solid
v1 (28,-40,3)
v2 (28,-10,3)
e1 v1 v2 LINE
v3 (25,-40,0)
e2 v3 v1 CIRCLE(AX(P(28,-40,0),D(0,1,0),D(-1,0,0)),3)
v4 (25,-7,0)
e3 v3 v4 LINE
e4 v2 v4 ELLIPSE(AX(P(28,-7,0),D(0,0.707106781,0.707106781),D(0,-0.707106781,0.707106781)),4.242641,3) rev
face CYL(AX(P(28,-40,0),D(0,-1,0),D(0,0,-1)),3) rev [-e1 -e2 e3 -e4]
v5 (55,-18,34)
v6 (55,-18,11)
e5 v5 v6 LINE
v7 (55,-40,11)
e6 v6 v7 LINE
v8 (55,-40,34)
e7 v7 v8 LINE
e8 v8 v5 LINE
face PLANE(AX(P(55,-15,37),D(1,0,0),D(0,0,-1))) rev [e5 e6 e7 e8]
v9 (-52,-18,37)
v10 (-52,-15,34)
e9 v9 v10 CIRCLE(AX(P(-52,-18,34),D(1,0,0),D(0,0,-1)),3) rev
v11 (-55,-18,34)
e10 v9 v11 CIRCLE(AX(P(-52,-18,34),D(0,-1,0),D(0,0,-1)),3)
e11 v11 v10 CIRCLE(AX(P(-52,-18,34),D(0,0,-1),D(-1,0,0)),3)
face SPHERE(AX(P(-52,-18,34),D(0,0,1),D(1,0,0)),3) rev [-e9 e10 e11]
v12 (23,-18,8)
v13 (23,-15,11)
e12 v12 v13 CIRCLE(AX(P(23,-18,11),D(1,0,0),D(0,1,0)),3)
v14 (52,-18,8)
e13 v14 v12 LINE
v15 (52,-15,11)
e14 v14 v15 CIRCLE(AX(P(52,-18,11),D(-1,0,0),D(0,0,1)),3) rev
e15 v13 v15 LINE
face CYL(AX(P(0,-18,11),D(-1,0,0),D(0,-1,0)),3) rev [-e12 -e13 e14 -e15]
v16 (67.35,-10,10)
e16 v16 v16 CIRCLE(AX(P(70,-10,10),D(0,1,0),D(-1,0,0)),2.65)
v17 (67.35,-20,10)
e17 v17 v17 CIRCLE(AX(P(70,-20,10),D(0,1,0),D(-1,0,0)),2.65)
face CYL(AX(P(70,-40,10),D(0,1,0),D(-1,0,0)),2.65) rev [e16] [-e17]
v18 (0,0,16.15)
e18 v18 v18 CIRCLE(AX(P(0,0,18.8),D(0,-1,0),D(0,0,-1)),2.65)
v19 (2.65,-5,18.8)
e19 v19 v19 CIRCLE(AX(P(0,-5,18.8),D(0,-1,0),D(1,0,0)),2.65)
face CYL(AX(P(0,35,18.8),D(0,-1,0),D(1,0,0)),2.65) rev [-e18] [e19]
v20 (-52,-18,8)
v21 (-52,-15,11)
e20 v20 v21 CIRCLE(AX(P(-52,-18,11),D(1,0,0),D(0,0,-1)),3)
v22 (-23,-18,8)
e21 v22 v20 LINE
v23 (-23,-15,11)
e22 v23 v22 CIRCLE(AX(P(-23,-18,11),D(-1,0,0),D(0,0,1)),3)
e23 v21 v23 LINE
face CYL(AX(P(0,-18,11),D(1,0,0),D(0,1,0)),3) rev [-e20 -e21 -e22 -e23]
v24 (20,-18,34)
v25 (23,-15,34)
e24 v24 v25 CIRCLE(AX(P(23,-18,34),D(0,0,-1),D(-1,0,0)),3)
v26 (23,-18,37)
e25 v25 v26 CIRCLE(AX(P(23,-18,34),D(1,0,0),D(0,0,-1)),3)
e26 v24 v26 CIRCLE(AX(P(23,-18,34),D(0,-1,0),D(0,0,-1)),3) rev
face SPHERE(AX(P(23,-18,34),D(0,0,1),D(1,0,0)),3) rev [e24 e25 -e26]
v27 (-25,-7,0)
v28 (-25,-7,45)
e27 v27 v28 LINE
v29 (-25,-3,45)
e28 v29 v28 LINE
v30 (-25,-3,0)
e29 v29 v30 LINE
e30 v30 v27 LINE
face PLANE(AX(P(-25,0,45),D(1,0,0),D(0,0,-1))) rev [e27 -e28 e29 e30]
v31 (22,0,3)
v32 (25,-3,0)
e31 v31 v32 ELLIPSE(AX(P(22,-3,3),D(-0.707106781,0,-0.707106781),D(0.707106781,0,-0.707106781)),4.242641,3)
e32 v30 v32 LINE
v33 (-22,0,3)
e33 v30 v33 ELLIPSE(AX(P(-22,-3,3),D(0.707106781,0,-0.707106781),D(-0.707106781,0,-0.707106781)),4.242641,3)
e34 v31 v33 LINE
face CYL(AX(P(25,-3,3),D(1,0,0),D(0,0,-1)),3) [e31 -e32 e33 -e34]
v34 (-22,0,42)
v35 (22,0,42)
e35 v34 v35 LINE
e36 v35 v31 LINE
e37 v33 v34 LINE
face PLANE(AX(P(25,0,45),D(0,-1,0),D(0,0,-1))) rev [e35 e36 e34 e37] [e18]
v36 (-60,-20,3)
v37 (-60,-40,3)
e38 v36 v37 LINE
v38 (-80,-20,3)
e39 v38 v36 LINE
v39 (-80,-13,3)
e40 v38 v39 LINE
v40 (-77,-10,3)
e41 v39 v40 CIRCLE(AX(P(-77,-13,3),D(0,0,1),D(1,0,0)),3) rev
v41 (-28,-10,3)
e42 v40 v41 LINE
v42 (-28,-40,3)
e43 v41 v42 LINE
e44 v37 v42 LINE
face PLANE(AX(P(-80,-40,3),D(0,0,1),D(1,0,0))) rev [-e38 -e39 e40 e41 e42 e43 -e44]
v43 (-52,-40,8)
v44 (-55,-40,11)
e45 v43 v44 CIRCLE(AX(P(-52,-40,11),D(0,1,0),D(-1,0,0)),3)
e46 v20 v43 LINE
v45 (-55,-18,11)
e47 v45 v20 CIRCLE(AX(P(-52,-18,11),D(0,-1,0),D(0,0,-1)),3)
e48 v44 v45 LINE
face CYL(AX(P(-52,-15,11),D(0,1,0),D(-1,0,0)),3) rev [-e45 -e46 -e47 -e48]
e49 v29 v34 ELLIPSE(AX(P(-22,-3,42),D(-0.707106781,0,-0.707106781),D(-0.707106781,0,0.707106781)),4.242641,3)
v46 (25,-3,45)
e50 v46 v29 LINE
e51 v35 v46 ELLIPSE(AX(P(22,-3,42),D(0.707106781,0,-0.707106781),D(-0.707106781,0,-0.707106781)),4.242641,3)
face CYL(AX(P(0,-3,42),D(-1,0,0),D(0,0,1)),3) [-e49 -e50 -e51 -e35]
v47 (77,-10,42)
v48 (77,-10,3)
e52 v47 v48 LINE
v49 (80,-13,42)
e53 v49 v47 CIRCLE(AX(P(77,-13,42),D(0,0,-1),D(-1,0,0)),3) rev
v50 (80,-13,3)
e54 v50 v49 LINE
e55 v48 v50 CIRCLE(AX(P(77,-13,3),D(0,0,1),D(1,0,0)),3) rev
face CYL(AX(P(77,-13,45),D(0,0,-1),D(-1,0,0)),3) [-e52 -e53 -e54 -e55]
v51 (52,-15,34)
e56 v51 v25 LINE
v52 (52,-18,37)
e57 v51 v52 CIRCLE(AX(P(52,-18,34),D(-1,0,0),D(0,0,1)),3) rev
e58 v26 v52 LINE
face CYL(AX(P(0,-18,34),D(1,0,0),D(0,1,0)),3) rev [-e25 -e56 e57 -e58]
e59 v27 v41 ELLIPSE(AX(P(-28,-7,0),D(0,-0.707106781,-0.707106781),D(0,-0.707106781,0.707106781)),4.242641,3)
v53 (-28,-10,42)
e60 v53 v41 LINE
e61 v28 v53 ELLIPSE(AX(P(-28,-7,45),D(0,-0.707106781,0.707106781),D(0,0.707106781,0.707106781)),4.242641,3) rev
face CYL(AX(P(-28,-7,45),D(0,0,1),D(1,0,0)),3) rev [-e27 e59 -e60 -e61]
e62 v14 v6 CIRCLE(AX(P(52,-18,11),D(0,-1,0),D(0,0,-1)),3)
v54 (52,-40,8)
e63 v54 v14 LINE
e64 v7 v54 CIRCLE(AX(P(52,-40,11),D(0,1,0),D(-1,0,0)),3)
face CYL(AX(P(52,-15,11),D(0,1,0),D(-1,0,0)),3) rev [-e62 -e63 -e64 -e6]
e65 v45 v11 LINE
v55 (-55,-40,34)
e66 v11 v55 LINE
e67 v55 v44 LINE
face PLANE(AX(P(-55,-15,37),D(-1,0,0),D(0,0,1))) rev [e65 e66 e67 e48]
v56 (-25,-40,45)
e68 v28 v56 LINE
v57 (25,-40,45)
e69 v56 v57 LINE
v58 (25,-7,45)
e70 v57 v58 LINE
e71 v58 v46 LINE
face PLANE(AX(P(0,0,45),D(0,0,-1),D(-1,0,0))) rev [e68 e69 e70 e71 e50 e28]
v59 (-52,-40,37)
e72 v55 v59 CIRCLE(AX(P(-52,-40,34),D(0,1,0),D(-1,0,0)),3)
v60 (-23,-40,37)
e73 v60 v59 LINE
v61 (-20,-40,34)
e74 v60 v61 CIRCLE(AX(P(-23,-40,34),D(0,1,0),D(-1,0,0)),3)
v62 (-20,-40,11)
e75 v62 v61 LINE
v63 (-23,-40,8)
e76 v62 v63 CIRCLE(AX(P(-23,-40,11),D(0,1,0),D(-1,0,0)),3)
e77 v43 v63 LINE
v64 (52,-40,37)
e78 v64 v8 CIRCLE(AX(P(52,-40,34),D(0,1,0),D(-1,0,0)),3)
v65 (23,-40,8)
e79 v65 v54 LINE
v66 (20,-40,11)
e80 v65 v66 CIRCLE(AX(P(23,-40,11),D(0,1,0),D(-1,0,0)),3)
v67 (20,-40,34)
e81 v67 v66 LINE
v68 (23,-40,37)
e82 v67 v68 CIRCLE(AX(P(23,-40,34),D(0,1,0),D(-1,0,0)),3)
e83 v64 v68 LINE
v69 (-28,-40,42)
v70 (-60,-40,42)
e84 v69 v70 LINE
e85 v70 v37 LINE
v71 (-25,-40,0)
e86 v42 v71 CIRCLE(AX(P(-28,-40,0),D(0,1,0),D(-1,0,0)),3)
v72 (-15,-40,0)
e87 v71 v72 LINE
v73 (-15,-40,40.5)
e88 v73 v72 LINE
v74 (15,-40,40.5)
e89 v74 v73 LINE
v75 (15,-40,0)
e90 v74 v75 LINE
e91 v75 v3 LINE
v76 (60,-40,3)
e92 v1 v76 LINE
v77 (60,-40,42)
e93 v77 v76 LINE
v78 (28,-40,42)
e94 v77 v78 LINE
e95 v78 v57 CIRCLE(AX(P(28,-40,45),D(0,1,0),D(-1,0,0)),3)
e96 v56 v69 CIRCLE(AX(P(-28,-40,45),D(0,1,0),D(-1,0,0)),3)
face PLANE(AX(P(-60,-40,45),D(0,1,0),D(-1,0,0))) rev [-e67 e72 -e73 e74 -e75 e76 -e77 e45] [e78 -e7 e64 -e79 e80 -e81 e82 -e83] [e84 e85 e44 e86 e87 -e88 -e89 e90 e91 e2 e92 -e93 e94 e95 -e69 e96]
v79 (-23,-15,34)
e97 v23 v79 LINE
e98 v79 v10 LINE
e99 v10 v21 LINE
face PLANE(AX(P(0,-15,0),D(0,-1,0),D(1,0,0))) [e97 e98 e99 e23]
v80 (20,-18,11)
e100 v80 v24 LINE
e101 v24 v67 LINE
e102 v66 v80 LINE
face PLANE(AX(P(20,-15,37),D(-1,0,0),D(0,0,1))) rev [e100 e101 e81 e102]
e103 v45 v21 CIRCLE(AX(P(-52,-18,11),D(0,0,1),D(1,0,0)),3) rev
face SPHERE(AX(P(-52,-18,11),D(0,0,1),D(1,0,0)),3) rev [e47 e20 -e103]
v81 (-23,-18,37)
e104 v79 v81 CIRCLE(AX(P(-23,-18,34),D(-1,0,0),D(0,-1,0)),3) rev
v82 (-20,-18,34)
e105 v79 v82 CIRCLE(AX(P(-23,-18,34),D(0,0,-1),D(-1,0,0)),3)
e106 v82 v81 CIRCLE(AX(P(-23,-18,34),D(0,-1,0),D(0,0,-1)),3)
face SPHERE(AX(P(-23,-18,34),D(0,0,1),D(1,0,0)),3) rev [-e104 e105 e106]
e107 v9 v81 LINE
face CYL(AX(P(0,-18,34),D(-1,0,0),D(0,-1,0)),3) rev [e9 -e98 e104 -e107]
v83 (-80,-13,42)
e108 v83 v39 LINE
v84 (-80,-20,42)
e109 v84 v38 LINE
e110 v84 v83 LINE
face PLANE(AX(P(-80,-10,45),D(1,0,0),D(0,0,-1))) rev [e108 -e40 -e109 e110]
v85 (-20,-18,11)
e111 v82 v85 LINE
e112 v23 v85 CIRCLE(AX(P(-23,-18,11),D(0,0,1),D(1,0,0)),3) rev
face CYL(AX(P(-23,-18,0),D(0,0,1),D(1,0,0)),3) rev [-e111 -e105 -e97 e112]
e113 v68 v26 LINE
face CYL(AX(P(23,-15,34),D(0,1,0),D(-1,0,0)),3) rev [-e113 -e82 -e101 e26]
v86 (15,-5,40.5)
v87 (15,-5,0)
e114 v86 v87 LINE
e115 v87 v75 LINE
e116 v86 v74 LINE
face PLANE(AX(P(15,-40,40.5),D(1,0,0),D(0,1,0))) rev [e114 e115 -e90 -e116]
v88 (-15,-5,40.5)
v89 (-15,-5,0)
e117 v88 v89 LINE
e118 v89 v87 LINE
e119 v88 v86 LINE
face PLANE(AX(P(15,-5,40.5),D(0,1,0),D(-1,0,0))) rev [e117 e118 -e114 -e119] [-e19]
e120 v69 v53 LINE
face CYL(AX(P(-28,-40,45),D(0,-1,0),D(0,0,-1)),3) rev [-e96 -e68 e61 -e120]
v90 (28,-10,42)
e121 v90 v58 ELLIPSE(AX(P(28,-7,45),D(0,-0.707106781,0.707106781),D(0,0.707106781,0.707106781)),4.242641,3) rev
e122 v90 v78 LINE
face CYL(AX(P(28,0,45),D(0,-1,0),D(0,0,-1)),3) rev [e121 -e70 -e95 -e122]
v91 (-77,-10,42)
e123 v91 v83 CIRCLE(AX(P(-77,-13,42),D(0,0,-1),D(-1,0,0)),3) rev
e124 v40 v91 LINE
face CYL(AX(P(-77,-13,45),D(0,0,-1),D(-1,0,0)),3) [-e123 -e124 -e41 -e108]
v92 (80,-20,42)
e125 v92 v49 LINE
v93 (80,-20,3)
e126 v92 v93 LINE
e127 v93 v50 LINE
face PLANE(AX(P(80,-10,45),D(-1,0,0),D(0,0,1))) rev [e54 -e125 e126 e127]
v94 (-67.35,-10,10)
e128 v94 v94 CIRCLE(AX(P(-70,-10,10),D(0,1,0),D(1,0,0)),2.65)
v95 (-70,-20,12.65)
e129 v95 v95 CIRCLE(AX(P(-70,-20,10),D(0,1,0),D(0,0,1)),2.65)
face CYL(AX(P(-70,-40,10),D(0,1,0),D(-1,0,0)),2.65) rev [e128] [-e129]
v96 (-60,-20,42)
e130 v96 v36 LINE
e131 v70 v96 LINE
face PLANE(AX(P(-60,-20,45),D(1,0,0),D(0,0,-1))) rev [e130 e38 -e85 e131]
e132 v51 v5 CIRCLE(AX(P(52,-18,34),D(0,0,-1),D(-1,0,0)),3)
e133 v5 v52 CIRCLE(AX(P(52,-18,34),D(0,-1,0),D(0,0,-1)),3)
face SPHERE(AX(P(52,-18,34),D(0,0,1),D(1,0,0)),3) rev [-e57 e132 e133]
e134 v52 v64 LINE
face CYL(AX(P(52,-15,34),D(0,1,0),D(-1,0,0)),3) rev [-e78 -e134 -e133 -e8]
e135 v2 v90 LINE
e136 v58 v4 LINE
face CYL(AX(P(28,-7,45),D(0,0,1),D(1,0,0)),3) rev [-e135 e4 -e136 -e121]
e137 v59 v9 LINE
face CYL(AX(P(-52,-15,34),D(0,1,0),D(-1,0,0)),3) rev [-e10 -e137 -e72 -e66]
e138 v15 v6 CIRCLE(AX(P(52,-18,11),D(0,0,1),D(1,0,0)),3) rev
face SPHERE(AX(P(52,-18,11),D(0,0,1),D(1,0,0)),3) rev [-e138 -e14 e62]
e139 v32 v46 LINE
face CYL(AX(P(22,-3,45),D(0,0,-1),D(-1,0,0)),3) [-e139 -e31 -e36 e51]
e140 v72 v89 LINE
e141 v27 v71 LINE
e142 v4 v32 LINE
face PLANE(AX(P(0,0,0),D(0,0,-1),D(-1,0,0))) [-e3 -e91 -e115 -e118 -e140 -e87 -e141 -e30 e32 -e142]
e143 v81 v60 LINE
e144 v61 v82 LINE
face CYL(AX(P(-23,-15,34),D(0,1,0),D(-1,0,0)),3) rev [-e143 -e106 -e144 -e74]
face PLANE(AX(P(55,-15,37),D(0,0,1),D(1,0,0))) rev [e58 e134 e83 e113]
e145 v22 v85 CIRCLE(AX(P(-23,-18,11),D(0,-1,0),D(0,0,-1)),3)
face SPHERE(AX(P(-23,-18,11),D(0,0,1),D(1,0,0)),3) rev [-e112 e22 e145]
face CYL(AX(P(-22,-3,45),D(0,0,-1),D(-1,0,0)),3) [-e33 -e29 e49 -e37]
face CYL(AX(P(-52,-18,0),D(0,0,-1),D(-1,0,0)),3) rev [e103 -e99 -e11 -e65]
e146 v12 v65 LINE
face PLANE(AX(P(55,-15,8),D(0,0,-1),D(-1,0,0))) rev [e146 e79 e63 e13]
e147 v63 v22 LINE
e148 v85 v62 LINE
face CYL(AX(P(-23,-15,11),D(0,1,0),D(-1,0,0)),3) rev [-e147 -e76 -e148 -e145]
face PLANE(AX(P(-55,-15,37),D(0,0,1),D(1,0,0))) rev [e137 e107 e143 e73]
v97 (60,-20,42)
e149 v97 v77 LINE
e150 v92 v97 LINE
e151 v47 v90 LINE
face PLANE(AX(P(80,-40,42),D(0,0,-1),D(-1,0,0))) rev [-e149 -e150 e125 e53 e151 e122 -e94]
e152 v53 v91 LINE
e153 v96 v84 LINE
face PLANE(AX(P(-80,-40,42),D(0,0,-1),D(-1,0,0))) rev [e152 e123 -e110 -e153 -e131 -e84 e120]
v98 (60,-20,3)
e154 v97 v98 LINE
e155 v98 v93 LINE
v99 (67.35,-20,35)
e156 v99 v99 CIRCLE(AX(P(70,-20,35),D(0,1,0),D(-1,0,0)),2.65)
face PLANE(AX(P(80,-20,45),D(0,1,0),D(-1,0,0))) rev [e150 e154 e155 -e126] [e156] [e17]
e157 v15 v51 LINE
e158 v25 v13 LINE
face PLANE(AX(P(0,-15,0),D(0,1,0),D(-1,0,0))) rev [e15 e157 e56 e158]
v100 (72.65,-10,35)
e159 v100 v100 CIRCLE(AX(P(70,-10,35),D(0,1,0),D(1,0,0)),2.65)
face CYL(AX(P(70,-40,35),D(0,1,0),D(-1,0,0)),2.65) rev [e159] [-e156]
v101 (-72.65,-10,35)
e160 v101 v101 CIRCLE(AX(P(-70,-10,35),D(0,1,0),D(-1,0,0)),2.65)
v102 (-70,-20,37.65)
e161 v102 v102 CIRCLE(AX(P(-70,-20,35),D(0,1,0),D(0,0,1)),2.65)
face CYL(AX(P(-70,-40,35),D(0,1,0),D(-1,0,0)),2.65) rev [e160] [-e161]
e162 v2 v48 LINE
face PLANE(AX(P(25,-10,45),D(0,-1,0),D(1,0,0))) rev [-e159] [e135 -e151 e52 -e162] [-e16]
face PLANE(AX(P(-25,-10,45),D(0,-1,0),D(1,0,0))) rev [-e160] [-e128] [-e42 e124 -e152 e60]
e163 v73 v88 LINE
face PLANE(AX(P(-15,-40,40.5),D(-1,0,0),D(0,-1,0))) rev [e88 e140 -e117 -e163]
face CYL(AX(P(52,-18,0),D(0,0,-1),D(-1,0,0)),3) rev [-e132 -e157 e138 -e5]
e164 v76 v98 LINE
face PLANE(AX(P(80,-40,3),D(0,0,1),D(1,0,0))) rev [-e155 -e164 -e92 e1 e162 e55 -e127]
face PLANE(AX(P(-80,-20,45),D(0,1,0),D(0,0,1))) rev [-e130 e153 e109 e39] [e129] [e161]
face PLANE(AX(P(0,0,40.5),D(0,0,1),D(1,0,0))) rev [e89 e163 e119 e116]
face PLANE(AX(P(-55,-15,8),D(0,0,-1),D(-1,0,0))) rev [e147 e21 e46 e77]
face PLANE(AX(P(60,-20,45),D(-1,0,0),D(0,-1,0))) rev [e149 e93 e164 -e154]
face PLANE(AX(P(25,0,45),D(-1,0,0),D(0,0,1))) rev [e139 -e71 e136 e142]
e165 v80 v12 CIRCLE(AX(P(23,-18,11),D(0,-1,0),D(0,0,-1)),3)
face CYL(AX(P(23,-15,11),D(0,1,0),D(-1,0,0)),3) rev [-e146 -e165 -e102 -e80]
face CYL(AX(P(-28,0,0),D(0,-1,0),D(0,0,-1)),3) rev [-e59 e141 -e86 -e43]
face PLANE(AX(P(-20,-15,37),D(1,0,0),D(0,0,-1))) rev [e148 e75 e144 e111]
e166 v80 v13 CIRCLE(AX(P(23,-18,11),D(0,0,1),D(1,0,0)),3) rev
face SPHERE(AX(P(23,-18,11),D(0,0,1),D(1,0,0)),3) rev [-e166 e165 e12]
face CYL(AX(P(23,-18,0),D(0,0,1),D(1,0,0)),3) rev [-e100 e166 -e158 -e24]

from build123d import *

# Parameters (mm, degrees)
EXTRUDE_1_DEPTH     = 45
SKETCH_2_W          = 30
SKETCH_2_H          = 35
CUT_EXTRUDE_1_DEPTH = 40.5
SKETCH_4_R          = 2.65
CUT_EXTRUDE_2_DEPTH = 40
SKETCH_5_W          = 35
SKETCH_5_H          = 29
CUT_EXTRUDE_3_DEPTH = 25
SKETCH_6_R          = 2.65
CUT_EXTRUDE_4_DEPTH = 97.566039579
SKETCH_7_W          = 55
SKETCH_7_H          = 3
CUT_EXTRUDE_5_DEPTH = 97.566039579
FILLET_1_R          = 3


with BuildPart() as part:
    # 草图1 → 凸台-拉伸1 (new body)
    with BuildSketch(Plane.XY):
        Polygon((25, 0), (-25, 0), (-25, -10), (-80, -10), (-80, -20), (-60, -20), (-60, -40), (60, -40), (60, -20), (80, -20), (80, -10), (25, -10), align=None)
    extrude(amount=EXTRUDE_1_DEPTH)

    # 草图2 → 切除-拉伸1 (cut)
    with BuildSketch(Plane(origin=(0, 0, 0), x_dir=(-1, 0, 0), z_dir=(0, 0, -1))):
        with Locations((0, -22.5)):
            Rectangle(SKETCH_2_W, SKETCH_2_H)
    extrude(amount=-CUT_EXTRUDE_1_DEPTH, mode=Mode.SUBTRACT)

    # 草图4 → 切除-拉伸2 (cut)
    with BuildSketch(Plane.XZ.offset(5)):
        with Locations((0, 18.8)):
            Circle(SKETCH_4_R)
    extrude(amount=-CUT_EXTRUDE_2_DEPTH, mode=Mode.SUBTRACT)

    # 草图5 → 切除-拉伸3 (cut)
    with BuildSketch(Plane.XZ.offset(40)):
        with Locations((-37.5, 22.5)):
            Rectangle(SKETCH_5_W, SKETCH_5_H)
        with Locations((37.5, 22.5)):
            Rectangle(SKETCH_5_W, SKETCH_5_H)
    extrude(amount=-CUT_EXTRUDE_3_DEPTH, mode=Mode.SUBTRACT)

    # 草图6 → 切除-拉伸4 (cut, through all)
    with BuildSketch(Plane(origin=(0, -10, 0), x_dir=(1, 0, 0), z_dir=(0, 1, 0))):
        with Locations(Location((70, -10, 0), (0, 0, 180))):
            Circle(SKETCH_6_R)
        with Locations(Location((70, -35, 0), (0, 0, 180))):
            Circle(SKETCH_6_R)
        with Locations(Location((-70, -35, 0), (0, 0, 180))):
            Circle(SKETCH_6_R)
        with Locations(Location((-70, -10, 0), (0, 0, 270))):
            Circle(SKETCH_6_R)
    extrude(amount=-CUT_EXTRUDE_4_DEPTH, mode=Mode.SUBTRACT)

    # 草图7 → 切除-拉伸5 (cut, through all)
    with BuildSketch(Plane(origin=(0, -10, 0), x_dir=(1, 0, 0), z_dir=(0, 1, 0))):
        with Locations((-52.5, -1.5)):
            Rectangle(SKETCH_7_W, SKETCH_7_H)
        with Locations((-52.5, -43.5)):
            Rectangle(SKETCH_7_W, SKETCH_7_H)
        with Locations((52.5, -43.5)):
            Rectangle(SKETCH_7_W, SKETCH_7_H)
        with Locations((52.5, -1.5)):
            Rectangle(SKETCH_7_W, SKETCH_7_H)
    extrude(amount=-CUT_EXTRUDE_5_DEPTH, mode=Mode.SUBTRACT)

    # 圆角1
    fillet_1_edges = [part.edges().sort_by_distance(p)[0] for p in [
        (80, -10, 22.5),
        (-80, -10, 22.5),
        (0, 0, 0),
        (-25, 0, 22.5),
        (0, 0, 45),
        (25, 0, 22.5),
        (25, -25, 42),
        (-25, -25, 42),
        (-25, -10, 22.5),
        (-25, -25, 3),
        (25, -25, 3),
        (25, -10, 22.5),
        (-37.5, -15, 37),
        (-20, -15, 22.5),
        (-37.5, -15, 8),
        (-55, -15, 22.5),
        (-55, -27.5, 37),
        (-20, -27.5, 37),
        (-20, -27.5, 8),
        (-55, -27.5, 8),
        (20, -27.5, 37),
        (37.5, -15, 37),
        (55, -27.5, 37),
        (55, -15, 22.5),
        (20, -15, 22.5),
        (20, -27.5, 8),
        (55, -27.5, 8),
        (37.5, -15, 8),
    ]]
    fillet(fillet_1_edges, radius=FILLET_1_R - 0.0001)  # a hair under: the kernel refuses the full size


solid = part.part
